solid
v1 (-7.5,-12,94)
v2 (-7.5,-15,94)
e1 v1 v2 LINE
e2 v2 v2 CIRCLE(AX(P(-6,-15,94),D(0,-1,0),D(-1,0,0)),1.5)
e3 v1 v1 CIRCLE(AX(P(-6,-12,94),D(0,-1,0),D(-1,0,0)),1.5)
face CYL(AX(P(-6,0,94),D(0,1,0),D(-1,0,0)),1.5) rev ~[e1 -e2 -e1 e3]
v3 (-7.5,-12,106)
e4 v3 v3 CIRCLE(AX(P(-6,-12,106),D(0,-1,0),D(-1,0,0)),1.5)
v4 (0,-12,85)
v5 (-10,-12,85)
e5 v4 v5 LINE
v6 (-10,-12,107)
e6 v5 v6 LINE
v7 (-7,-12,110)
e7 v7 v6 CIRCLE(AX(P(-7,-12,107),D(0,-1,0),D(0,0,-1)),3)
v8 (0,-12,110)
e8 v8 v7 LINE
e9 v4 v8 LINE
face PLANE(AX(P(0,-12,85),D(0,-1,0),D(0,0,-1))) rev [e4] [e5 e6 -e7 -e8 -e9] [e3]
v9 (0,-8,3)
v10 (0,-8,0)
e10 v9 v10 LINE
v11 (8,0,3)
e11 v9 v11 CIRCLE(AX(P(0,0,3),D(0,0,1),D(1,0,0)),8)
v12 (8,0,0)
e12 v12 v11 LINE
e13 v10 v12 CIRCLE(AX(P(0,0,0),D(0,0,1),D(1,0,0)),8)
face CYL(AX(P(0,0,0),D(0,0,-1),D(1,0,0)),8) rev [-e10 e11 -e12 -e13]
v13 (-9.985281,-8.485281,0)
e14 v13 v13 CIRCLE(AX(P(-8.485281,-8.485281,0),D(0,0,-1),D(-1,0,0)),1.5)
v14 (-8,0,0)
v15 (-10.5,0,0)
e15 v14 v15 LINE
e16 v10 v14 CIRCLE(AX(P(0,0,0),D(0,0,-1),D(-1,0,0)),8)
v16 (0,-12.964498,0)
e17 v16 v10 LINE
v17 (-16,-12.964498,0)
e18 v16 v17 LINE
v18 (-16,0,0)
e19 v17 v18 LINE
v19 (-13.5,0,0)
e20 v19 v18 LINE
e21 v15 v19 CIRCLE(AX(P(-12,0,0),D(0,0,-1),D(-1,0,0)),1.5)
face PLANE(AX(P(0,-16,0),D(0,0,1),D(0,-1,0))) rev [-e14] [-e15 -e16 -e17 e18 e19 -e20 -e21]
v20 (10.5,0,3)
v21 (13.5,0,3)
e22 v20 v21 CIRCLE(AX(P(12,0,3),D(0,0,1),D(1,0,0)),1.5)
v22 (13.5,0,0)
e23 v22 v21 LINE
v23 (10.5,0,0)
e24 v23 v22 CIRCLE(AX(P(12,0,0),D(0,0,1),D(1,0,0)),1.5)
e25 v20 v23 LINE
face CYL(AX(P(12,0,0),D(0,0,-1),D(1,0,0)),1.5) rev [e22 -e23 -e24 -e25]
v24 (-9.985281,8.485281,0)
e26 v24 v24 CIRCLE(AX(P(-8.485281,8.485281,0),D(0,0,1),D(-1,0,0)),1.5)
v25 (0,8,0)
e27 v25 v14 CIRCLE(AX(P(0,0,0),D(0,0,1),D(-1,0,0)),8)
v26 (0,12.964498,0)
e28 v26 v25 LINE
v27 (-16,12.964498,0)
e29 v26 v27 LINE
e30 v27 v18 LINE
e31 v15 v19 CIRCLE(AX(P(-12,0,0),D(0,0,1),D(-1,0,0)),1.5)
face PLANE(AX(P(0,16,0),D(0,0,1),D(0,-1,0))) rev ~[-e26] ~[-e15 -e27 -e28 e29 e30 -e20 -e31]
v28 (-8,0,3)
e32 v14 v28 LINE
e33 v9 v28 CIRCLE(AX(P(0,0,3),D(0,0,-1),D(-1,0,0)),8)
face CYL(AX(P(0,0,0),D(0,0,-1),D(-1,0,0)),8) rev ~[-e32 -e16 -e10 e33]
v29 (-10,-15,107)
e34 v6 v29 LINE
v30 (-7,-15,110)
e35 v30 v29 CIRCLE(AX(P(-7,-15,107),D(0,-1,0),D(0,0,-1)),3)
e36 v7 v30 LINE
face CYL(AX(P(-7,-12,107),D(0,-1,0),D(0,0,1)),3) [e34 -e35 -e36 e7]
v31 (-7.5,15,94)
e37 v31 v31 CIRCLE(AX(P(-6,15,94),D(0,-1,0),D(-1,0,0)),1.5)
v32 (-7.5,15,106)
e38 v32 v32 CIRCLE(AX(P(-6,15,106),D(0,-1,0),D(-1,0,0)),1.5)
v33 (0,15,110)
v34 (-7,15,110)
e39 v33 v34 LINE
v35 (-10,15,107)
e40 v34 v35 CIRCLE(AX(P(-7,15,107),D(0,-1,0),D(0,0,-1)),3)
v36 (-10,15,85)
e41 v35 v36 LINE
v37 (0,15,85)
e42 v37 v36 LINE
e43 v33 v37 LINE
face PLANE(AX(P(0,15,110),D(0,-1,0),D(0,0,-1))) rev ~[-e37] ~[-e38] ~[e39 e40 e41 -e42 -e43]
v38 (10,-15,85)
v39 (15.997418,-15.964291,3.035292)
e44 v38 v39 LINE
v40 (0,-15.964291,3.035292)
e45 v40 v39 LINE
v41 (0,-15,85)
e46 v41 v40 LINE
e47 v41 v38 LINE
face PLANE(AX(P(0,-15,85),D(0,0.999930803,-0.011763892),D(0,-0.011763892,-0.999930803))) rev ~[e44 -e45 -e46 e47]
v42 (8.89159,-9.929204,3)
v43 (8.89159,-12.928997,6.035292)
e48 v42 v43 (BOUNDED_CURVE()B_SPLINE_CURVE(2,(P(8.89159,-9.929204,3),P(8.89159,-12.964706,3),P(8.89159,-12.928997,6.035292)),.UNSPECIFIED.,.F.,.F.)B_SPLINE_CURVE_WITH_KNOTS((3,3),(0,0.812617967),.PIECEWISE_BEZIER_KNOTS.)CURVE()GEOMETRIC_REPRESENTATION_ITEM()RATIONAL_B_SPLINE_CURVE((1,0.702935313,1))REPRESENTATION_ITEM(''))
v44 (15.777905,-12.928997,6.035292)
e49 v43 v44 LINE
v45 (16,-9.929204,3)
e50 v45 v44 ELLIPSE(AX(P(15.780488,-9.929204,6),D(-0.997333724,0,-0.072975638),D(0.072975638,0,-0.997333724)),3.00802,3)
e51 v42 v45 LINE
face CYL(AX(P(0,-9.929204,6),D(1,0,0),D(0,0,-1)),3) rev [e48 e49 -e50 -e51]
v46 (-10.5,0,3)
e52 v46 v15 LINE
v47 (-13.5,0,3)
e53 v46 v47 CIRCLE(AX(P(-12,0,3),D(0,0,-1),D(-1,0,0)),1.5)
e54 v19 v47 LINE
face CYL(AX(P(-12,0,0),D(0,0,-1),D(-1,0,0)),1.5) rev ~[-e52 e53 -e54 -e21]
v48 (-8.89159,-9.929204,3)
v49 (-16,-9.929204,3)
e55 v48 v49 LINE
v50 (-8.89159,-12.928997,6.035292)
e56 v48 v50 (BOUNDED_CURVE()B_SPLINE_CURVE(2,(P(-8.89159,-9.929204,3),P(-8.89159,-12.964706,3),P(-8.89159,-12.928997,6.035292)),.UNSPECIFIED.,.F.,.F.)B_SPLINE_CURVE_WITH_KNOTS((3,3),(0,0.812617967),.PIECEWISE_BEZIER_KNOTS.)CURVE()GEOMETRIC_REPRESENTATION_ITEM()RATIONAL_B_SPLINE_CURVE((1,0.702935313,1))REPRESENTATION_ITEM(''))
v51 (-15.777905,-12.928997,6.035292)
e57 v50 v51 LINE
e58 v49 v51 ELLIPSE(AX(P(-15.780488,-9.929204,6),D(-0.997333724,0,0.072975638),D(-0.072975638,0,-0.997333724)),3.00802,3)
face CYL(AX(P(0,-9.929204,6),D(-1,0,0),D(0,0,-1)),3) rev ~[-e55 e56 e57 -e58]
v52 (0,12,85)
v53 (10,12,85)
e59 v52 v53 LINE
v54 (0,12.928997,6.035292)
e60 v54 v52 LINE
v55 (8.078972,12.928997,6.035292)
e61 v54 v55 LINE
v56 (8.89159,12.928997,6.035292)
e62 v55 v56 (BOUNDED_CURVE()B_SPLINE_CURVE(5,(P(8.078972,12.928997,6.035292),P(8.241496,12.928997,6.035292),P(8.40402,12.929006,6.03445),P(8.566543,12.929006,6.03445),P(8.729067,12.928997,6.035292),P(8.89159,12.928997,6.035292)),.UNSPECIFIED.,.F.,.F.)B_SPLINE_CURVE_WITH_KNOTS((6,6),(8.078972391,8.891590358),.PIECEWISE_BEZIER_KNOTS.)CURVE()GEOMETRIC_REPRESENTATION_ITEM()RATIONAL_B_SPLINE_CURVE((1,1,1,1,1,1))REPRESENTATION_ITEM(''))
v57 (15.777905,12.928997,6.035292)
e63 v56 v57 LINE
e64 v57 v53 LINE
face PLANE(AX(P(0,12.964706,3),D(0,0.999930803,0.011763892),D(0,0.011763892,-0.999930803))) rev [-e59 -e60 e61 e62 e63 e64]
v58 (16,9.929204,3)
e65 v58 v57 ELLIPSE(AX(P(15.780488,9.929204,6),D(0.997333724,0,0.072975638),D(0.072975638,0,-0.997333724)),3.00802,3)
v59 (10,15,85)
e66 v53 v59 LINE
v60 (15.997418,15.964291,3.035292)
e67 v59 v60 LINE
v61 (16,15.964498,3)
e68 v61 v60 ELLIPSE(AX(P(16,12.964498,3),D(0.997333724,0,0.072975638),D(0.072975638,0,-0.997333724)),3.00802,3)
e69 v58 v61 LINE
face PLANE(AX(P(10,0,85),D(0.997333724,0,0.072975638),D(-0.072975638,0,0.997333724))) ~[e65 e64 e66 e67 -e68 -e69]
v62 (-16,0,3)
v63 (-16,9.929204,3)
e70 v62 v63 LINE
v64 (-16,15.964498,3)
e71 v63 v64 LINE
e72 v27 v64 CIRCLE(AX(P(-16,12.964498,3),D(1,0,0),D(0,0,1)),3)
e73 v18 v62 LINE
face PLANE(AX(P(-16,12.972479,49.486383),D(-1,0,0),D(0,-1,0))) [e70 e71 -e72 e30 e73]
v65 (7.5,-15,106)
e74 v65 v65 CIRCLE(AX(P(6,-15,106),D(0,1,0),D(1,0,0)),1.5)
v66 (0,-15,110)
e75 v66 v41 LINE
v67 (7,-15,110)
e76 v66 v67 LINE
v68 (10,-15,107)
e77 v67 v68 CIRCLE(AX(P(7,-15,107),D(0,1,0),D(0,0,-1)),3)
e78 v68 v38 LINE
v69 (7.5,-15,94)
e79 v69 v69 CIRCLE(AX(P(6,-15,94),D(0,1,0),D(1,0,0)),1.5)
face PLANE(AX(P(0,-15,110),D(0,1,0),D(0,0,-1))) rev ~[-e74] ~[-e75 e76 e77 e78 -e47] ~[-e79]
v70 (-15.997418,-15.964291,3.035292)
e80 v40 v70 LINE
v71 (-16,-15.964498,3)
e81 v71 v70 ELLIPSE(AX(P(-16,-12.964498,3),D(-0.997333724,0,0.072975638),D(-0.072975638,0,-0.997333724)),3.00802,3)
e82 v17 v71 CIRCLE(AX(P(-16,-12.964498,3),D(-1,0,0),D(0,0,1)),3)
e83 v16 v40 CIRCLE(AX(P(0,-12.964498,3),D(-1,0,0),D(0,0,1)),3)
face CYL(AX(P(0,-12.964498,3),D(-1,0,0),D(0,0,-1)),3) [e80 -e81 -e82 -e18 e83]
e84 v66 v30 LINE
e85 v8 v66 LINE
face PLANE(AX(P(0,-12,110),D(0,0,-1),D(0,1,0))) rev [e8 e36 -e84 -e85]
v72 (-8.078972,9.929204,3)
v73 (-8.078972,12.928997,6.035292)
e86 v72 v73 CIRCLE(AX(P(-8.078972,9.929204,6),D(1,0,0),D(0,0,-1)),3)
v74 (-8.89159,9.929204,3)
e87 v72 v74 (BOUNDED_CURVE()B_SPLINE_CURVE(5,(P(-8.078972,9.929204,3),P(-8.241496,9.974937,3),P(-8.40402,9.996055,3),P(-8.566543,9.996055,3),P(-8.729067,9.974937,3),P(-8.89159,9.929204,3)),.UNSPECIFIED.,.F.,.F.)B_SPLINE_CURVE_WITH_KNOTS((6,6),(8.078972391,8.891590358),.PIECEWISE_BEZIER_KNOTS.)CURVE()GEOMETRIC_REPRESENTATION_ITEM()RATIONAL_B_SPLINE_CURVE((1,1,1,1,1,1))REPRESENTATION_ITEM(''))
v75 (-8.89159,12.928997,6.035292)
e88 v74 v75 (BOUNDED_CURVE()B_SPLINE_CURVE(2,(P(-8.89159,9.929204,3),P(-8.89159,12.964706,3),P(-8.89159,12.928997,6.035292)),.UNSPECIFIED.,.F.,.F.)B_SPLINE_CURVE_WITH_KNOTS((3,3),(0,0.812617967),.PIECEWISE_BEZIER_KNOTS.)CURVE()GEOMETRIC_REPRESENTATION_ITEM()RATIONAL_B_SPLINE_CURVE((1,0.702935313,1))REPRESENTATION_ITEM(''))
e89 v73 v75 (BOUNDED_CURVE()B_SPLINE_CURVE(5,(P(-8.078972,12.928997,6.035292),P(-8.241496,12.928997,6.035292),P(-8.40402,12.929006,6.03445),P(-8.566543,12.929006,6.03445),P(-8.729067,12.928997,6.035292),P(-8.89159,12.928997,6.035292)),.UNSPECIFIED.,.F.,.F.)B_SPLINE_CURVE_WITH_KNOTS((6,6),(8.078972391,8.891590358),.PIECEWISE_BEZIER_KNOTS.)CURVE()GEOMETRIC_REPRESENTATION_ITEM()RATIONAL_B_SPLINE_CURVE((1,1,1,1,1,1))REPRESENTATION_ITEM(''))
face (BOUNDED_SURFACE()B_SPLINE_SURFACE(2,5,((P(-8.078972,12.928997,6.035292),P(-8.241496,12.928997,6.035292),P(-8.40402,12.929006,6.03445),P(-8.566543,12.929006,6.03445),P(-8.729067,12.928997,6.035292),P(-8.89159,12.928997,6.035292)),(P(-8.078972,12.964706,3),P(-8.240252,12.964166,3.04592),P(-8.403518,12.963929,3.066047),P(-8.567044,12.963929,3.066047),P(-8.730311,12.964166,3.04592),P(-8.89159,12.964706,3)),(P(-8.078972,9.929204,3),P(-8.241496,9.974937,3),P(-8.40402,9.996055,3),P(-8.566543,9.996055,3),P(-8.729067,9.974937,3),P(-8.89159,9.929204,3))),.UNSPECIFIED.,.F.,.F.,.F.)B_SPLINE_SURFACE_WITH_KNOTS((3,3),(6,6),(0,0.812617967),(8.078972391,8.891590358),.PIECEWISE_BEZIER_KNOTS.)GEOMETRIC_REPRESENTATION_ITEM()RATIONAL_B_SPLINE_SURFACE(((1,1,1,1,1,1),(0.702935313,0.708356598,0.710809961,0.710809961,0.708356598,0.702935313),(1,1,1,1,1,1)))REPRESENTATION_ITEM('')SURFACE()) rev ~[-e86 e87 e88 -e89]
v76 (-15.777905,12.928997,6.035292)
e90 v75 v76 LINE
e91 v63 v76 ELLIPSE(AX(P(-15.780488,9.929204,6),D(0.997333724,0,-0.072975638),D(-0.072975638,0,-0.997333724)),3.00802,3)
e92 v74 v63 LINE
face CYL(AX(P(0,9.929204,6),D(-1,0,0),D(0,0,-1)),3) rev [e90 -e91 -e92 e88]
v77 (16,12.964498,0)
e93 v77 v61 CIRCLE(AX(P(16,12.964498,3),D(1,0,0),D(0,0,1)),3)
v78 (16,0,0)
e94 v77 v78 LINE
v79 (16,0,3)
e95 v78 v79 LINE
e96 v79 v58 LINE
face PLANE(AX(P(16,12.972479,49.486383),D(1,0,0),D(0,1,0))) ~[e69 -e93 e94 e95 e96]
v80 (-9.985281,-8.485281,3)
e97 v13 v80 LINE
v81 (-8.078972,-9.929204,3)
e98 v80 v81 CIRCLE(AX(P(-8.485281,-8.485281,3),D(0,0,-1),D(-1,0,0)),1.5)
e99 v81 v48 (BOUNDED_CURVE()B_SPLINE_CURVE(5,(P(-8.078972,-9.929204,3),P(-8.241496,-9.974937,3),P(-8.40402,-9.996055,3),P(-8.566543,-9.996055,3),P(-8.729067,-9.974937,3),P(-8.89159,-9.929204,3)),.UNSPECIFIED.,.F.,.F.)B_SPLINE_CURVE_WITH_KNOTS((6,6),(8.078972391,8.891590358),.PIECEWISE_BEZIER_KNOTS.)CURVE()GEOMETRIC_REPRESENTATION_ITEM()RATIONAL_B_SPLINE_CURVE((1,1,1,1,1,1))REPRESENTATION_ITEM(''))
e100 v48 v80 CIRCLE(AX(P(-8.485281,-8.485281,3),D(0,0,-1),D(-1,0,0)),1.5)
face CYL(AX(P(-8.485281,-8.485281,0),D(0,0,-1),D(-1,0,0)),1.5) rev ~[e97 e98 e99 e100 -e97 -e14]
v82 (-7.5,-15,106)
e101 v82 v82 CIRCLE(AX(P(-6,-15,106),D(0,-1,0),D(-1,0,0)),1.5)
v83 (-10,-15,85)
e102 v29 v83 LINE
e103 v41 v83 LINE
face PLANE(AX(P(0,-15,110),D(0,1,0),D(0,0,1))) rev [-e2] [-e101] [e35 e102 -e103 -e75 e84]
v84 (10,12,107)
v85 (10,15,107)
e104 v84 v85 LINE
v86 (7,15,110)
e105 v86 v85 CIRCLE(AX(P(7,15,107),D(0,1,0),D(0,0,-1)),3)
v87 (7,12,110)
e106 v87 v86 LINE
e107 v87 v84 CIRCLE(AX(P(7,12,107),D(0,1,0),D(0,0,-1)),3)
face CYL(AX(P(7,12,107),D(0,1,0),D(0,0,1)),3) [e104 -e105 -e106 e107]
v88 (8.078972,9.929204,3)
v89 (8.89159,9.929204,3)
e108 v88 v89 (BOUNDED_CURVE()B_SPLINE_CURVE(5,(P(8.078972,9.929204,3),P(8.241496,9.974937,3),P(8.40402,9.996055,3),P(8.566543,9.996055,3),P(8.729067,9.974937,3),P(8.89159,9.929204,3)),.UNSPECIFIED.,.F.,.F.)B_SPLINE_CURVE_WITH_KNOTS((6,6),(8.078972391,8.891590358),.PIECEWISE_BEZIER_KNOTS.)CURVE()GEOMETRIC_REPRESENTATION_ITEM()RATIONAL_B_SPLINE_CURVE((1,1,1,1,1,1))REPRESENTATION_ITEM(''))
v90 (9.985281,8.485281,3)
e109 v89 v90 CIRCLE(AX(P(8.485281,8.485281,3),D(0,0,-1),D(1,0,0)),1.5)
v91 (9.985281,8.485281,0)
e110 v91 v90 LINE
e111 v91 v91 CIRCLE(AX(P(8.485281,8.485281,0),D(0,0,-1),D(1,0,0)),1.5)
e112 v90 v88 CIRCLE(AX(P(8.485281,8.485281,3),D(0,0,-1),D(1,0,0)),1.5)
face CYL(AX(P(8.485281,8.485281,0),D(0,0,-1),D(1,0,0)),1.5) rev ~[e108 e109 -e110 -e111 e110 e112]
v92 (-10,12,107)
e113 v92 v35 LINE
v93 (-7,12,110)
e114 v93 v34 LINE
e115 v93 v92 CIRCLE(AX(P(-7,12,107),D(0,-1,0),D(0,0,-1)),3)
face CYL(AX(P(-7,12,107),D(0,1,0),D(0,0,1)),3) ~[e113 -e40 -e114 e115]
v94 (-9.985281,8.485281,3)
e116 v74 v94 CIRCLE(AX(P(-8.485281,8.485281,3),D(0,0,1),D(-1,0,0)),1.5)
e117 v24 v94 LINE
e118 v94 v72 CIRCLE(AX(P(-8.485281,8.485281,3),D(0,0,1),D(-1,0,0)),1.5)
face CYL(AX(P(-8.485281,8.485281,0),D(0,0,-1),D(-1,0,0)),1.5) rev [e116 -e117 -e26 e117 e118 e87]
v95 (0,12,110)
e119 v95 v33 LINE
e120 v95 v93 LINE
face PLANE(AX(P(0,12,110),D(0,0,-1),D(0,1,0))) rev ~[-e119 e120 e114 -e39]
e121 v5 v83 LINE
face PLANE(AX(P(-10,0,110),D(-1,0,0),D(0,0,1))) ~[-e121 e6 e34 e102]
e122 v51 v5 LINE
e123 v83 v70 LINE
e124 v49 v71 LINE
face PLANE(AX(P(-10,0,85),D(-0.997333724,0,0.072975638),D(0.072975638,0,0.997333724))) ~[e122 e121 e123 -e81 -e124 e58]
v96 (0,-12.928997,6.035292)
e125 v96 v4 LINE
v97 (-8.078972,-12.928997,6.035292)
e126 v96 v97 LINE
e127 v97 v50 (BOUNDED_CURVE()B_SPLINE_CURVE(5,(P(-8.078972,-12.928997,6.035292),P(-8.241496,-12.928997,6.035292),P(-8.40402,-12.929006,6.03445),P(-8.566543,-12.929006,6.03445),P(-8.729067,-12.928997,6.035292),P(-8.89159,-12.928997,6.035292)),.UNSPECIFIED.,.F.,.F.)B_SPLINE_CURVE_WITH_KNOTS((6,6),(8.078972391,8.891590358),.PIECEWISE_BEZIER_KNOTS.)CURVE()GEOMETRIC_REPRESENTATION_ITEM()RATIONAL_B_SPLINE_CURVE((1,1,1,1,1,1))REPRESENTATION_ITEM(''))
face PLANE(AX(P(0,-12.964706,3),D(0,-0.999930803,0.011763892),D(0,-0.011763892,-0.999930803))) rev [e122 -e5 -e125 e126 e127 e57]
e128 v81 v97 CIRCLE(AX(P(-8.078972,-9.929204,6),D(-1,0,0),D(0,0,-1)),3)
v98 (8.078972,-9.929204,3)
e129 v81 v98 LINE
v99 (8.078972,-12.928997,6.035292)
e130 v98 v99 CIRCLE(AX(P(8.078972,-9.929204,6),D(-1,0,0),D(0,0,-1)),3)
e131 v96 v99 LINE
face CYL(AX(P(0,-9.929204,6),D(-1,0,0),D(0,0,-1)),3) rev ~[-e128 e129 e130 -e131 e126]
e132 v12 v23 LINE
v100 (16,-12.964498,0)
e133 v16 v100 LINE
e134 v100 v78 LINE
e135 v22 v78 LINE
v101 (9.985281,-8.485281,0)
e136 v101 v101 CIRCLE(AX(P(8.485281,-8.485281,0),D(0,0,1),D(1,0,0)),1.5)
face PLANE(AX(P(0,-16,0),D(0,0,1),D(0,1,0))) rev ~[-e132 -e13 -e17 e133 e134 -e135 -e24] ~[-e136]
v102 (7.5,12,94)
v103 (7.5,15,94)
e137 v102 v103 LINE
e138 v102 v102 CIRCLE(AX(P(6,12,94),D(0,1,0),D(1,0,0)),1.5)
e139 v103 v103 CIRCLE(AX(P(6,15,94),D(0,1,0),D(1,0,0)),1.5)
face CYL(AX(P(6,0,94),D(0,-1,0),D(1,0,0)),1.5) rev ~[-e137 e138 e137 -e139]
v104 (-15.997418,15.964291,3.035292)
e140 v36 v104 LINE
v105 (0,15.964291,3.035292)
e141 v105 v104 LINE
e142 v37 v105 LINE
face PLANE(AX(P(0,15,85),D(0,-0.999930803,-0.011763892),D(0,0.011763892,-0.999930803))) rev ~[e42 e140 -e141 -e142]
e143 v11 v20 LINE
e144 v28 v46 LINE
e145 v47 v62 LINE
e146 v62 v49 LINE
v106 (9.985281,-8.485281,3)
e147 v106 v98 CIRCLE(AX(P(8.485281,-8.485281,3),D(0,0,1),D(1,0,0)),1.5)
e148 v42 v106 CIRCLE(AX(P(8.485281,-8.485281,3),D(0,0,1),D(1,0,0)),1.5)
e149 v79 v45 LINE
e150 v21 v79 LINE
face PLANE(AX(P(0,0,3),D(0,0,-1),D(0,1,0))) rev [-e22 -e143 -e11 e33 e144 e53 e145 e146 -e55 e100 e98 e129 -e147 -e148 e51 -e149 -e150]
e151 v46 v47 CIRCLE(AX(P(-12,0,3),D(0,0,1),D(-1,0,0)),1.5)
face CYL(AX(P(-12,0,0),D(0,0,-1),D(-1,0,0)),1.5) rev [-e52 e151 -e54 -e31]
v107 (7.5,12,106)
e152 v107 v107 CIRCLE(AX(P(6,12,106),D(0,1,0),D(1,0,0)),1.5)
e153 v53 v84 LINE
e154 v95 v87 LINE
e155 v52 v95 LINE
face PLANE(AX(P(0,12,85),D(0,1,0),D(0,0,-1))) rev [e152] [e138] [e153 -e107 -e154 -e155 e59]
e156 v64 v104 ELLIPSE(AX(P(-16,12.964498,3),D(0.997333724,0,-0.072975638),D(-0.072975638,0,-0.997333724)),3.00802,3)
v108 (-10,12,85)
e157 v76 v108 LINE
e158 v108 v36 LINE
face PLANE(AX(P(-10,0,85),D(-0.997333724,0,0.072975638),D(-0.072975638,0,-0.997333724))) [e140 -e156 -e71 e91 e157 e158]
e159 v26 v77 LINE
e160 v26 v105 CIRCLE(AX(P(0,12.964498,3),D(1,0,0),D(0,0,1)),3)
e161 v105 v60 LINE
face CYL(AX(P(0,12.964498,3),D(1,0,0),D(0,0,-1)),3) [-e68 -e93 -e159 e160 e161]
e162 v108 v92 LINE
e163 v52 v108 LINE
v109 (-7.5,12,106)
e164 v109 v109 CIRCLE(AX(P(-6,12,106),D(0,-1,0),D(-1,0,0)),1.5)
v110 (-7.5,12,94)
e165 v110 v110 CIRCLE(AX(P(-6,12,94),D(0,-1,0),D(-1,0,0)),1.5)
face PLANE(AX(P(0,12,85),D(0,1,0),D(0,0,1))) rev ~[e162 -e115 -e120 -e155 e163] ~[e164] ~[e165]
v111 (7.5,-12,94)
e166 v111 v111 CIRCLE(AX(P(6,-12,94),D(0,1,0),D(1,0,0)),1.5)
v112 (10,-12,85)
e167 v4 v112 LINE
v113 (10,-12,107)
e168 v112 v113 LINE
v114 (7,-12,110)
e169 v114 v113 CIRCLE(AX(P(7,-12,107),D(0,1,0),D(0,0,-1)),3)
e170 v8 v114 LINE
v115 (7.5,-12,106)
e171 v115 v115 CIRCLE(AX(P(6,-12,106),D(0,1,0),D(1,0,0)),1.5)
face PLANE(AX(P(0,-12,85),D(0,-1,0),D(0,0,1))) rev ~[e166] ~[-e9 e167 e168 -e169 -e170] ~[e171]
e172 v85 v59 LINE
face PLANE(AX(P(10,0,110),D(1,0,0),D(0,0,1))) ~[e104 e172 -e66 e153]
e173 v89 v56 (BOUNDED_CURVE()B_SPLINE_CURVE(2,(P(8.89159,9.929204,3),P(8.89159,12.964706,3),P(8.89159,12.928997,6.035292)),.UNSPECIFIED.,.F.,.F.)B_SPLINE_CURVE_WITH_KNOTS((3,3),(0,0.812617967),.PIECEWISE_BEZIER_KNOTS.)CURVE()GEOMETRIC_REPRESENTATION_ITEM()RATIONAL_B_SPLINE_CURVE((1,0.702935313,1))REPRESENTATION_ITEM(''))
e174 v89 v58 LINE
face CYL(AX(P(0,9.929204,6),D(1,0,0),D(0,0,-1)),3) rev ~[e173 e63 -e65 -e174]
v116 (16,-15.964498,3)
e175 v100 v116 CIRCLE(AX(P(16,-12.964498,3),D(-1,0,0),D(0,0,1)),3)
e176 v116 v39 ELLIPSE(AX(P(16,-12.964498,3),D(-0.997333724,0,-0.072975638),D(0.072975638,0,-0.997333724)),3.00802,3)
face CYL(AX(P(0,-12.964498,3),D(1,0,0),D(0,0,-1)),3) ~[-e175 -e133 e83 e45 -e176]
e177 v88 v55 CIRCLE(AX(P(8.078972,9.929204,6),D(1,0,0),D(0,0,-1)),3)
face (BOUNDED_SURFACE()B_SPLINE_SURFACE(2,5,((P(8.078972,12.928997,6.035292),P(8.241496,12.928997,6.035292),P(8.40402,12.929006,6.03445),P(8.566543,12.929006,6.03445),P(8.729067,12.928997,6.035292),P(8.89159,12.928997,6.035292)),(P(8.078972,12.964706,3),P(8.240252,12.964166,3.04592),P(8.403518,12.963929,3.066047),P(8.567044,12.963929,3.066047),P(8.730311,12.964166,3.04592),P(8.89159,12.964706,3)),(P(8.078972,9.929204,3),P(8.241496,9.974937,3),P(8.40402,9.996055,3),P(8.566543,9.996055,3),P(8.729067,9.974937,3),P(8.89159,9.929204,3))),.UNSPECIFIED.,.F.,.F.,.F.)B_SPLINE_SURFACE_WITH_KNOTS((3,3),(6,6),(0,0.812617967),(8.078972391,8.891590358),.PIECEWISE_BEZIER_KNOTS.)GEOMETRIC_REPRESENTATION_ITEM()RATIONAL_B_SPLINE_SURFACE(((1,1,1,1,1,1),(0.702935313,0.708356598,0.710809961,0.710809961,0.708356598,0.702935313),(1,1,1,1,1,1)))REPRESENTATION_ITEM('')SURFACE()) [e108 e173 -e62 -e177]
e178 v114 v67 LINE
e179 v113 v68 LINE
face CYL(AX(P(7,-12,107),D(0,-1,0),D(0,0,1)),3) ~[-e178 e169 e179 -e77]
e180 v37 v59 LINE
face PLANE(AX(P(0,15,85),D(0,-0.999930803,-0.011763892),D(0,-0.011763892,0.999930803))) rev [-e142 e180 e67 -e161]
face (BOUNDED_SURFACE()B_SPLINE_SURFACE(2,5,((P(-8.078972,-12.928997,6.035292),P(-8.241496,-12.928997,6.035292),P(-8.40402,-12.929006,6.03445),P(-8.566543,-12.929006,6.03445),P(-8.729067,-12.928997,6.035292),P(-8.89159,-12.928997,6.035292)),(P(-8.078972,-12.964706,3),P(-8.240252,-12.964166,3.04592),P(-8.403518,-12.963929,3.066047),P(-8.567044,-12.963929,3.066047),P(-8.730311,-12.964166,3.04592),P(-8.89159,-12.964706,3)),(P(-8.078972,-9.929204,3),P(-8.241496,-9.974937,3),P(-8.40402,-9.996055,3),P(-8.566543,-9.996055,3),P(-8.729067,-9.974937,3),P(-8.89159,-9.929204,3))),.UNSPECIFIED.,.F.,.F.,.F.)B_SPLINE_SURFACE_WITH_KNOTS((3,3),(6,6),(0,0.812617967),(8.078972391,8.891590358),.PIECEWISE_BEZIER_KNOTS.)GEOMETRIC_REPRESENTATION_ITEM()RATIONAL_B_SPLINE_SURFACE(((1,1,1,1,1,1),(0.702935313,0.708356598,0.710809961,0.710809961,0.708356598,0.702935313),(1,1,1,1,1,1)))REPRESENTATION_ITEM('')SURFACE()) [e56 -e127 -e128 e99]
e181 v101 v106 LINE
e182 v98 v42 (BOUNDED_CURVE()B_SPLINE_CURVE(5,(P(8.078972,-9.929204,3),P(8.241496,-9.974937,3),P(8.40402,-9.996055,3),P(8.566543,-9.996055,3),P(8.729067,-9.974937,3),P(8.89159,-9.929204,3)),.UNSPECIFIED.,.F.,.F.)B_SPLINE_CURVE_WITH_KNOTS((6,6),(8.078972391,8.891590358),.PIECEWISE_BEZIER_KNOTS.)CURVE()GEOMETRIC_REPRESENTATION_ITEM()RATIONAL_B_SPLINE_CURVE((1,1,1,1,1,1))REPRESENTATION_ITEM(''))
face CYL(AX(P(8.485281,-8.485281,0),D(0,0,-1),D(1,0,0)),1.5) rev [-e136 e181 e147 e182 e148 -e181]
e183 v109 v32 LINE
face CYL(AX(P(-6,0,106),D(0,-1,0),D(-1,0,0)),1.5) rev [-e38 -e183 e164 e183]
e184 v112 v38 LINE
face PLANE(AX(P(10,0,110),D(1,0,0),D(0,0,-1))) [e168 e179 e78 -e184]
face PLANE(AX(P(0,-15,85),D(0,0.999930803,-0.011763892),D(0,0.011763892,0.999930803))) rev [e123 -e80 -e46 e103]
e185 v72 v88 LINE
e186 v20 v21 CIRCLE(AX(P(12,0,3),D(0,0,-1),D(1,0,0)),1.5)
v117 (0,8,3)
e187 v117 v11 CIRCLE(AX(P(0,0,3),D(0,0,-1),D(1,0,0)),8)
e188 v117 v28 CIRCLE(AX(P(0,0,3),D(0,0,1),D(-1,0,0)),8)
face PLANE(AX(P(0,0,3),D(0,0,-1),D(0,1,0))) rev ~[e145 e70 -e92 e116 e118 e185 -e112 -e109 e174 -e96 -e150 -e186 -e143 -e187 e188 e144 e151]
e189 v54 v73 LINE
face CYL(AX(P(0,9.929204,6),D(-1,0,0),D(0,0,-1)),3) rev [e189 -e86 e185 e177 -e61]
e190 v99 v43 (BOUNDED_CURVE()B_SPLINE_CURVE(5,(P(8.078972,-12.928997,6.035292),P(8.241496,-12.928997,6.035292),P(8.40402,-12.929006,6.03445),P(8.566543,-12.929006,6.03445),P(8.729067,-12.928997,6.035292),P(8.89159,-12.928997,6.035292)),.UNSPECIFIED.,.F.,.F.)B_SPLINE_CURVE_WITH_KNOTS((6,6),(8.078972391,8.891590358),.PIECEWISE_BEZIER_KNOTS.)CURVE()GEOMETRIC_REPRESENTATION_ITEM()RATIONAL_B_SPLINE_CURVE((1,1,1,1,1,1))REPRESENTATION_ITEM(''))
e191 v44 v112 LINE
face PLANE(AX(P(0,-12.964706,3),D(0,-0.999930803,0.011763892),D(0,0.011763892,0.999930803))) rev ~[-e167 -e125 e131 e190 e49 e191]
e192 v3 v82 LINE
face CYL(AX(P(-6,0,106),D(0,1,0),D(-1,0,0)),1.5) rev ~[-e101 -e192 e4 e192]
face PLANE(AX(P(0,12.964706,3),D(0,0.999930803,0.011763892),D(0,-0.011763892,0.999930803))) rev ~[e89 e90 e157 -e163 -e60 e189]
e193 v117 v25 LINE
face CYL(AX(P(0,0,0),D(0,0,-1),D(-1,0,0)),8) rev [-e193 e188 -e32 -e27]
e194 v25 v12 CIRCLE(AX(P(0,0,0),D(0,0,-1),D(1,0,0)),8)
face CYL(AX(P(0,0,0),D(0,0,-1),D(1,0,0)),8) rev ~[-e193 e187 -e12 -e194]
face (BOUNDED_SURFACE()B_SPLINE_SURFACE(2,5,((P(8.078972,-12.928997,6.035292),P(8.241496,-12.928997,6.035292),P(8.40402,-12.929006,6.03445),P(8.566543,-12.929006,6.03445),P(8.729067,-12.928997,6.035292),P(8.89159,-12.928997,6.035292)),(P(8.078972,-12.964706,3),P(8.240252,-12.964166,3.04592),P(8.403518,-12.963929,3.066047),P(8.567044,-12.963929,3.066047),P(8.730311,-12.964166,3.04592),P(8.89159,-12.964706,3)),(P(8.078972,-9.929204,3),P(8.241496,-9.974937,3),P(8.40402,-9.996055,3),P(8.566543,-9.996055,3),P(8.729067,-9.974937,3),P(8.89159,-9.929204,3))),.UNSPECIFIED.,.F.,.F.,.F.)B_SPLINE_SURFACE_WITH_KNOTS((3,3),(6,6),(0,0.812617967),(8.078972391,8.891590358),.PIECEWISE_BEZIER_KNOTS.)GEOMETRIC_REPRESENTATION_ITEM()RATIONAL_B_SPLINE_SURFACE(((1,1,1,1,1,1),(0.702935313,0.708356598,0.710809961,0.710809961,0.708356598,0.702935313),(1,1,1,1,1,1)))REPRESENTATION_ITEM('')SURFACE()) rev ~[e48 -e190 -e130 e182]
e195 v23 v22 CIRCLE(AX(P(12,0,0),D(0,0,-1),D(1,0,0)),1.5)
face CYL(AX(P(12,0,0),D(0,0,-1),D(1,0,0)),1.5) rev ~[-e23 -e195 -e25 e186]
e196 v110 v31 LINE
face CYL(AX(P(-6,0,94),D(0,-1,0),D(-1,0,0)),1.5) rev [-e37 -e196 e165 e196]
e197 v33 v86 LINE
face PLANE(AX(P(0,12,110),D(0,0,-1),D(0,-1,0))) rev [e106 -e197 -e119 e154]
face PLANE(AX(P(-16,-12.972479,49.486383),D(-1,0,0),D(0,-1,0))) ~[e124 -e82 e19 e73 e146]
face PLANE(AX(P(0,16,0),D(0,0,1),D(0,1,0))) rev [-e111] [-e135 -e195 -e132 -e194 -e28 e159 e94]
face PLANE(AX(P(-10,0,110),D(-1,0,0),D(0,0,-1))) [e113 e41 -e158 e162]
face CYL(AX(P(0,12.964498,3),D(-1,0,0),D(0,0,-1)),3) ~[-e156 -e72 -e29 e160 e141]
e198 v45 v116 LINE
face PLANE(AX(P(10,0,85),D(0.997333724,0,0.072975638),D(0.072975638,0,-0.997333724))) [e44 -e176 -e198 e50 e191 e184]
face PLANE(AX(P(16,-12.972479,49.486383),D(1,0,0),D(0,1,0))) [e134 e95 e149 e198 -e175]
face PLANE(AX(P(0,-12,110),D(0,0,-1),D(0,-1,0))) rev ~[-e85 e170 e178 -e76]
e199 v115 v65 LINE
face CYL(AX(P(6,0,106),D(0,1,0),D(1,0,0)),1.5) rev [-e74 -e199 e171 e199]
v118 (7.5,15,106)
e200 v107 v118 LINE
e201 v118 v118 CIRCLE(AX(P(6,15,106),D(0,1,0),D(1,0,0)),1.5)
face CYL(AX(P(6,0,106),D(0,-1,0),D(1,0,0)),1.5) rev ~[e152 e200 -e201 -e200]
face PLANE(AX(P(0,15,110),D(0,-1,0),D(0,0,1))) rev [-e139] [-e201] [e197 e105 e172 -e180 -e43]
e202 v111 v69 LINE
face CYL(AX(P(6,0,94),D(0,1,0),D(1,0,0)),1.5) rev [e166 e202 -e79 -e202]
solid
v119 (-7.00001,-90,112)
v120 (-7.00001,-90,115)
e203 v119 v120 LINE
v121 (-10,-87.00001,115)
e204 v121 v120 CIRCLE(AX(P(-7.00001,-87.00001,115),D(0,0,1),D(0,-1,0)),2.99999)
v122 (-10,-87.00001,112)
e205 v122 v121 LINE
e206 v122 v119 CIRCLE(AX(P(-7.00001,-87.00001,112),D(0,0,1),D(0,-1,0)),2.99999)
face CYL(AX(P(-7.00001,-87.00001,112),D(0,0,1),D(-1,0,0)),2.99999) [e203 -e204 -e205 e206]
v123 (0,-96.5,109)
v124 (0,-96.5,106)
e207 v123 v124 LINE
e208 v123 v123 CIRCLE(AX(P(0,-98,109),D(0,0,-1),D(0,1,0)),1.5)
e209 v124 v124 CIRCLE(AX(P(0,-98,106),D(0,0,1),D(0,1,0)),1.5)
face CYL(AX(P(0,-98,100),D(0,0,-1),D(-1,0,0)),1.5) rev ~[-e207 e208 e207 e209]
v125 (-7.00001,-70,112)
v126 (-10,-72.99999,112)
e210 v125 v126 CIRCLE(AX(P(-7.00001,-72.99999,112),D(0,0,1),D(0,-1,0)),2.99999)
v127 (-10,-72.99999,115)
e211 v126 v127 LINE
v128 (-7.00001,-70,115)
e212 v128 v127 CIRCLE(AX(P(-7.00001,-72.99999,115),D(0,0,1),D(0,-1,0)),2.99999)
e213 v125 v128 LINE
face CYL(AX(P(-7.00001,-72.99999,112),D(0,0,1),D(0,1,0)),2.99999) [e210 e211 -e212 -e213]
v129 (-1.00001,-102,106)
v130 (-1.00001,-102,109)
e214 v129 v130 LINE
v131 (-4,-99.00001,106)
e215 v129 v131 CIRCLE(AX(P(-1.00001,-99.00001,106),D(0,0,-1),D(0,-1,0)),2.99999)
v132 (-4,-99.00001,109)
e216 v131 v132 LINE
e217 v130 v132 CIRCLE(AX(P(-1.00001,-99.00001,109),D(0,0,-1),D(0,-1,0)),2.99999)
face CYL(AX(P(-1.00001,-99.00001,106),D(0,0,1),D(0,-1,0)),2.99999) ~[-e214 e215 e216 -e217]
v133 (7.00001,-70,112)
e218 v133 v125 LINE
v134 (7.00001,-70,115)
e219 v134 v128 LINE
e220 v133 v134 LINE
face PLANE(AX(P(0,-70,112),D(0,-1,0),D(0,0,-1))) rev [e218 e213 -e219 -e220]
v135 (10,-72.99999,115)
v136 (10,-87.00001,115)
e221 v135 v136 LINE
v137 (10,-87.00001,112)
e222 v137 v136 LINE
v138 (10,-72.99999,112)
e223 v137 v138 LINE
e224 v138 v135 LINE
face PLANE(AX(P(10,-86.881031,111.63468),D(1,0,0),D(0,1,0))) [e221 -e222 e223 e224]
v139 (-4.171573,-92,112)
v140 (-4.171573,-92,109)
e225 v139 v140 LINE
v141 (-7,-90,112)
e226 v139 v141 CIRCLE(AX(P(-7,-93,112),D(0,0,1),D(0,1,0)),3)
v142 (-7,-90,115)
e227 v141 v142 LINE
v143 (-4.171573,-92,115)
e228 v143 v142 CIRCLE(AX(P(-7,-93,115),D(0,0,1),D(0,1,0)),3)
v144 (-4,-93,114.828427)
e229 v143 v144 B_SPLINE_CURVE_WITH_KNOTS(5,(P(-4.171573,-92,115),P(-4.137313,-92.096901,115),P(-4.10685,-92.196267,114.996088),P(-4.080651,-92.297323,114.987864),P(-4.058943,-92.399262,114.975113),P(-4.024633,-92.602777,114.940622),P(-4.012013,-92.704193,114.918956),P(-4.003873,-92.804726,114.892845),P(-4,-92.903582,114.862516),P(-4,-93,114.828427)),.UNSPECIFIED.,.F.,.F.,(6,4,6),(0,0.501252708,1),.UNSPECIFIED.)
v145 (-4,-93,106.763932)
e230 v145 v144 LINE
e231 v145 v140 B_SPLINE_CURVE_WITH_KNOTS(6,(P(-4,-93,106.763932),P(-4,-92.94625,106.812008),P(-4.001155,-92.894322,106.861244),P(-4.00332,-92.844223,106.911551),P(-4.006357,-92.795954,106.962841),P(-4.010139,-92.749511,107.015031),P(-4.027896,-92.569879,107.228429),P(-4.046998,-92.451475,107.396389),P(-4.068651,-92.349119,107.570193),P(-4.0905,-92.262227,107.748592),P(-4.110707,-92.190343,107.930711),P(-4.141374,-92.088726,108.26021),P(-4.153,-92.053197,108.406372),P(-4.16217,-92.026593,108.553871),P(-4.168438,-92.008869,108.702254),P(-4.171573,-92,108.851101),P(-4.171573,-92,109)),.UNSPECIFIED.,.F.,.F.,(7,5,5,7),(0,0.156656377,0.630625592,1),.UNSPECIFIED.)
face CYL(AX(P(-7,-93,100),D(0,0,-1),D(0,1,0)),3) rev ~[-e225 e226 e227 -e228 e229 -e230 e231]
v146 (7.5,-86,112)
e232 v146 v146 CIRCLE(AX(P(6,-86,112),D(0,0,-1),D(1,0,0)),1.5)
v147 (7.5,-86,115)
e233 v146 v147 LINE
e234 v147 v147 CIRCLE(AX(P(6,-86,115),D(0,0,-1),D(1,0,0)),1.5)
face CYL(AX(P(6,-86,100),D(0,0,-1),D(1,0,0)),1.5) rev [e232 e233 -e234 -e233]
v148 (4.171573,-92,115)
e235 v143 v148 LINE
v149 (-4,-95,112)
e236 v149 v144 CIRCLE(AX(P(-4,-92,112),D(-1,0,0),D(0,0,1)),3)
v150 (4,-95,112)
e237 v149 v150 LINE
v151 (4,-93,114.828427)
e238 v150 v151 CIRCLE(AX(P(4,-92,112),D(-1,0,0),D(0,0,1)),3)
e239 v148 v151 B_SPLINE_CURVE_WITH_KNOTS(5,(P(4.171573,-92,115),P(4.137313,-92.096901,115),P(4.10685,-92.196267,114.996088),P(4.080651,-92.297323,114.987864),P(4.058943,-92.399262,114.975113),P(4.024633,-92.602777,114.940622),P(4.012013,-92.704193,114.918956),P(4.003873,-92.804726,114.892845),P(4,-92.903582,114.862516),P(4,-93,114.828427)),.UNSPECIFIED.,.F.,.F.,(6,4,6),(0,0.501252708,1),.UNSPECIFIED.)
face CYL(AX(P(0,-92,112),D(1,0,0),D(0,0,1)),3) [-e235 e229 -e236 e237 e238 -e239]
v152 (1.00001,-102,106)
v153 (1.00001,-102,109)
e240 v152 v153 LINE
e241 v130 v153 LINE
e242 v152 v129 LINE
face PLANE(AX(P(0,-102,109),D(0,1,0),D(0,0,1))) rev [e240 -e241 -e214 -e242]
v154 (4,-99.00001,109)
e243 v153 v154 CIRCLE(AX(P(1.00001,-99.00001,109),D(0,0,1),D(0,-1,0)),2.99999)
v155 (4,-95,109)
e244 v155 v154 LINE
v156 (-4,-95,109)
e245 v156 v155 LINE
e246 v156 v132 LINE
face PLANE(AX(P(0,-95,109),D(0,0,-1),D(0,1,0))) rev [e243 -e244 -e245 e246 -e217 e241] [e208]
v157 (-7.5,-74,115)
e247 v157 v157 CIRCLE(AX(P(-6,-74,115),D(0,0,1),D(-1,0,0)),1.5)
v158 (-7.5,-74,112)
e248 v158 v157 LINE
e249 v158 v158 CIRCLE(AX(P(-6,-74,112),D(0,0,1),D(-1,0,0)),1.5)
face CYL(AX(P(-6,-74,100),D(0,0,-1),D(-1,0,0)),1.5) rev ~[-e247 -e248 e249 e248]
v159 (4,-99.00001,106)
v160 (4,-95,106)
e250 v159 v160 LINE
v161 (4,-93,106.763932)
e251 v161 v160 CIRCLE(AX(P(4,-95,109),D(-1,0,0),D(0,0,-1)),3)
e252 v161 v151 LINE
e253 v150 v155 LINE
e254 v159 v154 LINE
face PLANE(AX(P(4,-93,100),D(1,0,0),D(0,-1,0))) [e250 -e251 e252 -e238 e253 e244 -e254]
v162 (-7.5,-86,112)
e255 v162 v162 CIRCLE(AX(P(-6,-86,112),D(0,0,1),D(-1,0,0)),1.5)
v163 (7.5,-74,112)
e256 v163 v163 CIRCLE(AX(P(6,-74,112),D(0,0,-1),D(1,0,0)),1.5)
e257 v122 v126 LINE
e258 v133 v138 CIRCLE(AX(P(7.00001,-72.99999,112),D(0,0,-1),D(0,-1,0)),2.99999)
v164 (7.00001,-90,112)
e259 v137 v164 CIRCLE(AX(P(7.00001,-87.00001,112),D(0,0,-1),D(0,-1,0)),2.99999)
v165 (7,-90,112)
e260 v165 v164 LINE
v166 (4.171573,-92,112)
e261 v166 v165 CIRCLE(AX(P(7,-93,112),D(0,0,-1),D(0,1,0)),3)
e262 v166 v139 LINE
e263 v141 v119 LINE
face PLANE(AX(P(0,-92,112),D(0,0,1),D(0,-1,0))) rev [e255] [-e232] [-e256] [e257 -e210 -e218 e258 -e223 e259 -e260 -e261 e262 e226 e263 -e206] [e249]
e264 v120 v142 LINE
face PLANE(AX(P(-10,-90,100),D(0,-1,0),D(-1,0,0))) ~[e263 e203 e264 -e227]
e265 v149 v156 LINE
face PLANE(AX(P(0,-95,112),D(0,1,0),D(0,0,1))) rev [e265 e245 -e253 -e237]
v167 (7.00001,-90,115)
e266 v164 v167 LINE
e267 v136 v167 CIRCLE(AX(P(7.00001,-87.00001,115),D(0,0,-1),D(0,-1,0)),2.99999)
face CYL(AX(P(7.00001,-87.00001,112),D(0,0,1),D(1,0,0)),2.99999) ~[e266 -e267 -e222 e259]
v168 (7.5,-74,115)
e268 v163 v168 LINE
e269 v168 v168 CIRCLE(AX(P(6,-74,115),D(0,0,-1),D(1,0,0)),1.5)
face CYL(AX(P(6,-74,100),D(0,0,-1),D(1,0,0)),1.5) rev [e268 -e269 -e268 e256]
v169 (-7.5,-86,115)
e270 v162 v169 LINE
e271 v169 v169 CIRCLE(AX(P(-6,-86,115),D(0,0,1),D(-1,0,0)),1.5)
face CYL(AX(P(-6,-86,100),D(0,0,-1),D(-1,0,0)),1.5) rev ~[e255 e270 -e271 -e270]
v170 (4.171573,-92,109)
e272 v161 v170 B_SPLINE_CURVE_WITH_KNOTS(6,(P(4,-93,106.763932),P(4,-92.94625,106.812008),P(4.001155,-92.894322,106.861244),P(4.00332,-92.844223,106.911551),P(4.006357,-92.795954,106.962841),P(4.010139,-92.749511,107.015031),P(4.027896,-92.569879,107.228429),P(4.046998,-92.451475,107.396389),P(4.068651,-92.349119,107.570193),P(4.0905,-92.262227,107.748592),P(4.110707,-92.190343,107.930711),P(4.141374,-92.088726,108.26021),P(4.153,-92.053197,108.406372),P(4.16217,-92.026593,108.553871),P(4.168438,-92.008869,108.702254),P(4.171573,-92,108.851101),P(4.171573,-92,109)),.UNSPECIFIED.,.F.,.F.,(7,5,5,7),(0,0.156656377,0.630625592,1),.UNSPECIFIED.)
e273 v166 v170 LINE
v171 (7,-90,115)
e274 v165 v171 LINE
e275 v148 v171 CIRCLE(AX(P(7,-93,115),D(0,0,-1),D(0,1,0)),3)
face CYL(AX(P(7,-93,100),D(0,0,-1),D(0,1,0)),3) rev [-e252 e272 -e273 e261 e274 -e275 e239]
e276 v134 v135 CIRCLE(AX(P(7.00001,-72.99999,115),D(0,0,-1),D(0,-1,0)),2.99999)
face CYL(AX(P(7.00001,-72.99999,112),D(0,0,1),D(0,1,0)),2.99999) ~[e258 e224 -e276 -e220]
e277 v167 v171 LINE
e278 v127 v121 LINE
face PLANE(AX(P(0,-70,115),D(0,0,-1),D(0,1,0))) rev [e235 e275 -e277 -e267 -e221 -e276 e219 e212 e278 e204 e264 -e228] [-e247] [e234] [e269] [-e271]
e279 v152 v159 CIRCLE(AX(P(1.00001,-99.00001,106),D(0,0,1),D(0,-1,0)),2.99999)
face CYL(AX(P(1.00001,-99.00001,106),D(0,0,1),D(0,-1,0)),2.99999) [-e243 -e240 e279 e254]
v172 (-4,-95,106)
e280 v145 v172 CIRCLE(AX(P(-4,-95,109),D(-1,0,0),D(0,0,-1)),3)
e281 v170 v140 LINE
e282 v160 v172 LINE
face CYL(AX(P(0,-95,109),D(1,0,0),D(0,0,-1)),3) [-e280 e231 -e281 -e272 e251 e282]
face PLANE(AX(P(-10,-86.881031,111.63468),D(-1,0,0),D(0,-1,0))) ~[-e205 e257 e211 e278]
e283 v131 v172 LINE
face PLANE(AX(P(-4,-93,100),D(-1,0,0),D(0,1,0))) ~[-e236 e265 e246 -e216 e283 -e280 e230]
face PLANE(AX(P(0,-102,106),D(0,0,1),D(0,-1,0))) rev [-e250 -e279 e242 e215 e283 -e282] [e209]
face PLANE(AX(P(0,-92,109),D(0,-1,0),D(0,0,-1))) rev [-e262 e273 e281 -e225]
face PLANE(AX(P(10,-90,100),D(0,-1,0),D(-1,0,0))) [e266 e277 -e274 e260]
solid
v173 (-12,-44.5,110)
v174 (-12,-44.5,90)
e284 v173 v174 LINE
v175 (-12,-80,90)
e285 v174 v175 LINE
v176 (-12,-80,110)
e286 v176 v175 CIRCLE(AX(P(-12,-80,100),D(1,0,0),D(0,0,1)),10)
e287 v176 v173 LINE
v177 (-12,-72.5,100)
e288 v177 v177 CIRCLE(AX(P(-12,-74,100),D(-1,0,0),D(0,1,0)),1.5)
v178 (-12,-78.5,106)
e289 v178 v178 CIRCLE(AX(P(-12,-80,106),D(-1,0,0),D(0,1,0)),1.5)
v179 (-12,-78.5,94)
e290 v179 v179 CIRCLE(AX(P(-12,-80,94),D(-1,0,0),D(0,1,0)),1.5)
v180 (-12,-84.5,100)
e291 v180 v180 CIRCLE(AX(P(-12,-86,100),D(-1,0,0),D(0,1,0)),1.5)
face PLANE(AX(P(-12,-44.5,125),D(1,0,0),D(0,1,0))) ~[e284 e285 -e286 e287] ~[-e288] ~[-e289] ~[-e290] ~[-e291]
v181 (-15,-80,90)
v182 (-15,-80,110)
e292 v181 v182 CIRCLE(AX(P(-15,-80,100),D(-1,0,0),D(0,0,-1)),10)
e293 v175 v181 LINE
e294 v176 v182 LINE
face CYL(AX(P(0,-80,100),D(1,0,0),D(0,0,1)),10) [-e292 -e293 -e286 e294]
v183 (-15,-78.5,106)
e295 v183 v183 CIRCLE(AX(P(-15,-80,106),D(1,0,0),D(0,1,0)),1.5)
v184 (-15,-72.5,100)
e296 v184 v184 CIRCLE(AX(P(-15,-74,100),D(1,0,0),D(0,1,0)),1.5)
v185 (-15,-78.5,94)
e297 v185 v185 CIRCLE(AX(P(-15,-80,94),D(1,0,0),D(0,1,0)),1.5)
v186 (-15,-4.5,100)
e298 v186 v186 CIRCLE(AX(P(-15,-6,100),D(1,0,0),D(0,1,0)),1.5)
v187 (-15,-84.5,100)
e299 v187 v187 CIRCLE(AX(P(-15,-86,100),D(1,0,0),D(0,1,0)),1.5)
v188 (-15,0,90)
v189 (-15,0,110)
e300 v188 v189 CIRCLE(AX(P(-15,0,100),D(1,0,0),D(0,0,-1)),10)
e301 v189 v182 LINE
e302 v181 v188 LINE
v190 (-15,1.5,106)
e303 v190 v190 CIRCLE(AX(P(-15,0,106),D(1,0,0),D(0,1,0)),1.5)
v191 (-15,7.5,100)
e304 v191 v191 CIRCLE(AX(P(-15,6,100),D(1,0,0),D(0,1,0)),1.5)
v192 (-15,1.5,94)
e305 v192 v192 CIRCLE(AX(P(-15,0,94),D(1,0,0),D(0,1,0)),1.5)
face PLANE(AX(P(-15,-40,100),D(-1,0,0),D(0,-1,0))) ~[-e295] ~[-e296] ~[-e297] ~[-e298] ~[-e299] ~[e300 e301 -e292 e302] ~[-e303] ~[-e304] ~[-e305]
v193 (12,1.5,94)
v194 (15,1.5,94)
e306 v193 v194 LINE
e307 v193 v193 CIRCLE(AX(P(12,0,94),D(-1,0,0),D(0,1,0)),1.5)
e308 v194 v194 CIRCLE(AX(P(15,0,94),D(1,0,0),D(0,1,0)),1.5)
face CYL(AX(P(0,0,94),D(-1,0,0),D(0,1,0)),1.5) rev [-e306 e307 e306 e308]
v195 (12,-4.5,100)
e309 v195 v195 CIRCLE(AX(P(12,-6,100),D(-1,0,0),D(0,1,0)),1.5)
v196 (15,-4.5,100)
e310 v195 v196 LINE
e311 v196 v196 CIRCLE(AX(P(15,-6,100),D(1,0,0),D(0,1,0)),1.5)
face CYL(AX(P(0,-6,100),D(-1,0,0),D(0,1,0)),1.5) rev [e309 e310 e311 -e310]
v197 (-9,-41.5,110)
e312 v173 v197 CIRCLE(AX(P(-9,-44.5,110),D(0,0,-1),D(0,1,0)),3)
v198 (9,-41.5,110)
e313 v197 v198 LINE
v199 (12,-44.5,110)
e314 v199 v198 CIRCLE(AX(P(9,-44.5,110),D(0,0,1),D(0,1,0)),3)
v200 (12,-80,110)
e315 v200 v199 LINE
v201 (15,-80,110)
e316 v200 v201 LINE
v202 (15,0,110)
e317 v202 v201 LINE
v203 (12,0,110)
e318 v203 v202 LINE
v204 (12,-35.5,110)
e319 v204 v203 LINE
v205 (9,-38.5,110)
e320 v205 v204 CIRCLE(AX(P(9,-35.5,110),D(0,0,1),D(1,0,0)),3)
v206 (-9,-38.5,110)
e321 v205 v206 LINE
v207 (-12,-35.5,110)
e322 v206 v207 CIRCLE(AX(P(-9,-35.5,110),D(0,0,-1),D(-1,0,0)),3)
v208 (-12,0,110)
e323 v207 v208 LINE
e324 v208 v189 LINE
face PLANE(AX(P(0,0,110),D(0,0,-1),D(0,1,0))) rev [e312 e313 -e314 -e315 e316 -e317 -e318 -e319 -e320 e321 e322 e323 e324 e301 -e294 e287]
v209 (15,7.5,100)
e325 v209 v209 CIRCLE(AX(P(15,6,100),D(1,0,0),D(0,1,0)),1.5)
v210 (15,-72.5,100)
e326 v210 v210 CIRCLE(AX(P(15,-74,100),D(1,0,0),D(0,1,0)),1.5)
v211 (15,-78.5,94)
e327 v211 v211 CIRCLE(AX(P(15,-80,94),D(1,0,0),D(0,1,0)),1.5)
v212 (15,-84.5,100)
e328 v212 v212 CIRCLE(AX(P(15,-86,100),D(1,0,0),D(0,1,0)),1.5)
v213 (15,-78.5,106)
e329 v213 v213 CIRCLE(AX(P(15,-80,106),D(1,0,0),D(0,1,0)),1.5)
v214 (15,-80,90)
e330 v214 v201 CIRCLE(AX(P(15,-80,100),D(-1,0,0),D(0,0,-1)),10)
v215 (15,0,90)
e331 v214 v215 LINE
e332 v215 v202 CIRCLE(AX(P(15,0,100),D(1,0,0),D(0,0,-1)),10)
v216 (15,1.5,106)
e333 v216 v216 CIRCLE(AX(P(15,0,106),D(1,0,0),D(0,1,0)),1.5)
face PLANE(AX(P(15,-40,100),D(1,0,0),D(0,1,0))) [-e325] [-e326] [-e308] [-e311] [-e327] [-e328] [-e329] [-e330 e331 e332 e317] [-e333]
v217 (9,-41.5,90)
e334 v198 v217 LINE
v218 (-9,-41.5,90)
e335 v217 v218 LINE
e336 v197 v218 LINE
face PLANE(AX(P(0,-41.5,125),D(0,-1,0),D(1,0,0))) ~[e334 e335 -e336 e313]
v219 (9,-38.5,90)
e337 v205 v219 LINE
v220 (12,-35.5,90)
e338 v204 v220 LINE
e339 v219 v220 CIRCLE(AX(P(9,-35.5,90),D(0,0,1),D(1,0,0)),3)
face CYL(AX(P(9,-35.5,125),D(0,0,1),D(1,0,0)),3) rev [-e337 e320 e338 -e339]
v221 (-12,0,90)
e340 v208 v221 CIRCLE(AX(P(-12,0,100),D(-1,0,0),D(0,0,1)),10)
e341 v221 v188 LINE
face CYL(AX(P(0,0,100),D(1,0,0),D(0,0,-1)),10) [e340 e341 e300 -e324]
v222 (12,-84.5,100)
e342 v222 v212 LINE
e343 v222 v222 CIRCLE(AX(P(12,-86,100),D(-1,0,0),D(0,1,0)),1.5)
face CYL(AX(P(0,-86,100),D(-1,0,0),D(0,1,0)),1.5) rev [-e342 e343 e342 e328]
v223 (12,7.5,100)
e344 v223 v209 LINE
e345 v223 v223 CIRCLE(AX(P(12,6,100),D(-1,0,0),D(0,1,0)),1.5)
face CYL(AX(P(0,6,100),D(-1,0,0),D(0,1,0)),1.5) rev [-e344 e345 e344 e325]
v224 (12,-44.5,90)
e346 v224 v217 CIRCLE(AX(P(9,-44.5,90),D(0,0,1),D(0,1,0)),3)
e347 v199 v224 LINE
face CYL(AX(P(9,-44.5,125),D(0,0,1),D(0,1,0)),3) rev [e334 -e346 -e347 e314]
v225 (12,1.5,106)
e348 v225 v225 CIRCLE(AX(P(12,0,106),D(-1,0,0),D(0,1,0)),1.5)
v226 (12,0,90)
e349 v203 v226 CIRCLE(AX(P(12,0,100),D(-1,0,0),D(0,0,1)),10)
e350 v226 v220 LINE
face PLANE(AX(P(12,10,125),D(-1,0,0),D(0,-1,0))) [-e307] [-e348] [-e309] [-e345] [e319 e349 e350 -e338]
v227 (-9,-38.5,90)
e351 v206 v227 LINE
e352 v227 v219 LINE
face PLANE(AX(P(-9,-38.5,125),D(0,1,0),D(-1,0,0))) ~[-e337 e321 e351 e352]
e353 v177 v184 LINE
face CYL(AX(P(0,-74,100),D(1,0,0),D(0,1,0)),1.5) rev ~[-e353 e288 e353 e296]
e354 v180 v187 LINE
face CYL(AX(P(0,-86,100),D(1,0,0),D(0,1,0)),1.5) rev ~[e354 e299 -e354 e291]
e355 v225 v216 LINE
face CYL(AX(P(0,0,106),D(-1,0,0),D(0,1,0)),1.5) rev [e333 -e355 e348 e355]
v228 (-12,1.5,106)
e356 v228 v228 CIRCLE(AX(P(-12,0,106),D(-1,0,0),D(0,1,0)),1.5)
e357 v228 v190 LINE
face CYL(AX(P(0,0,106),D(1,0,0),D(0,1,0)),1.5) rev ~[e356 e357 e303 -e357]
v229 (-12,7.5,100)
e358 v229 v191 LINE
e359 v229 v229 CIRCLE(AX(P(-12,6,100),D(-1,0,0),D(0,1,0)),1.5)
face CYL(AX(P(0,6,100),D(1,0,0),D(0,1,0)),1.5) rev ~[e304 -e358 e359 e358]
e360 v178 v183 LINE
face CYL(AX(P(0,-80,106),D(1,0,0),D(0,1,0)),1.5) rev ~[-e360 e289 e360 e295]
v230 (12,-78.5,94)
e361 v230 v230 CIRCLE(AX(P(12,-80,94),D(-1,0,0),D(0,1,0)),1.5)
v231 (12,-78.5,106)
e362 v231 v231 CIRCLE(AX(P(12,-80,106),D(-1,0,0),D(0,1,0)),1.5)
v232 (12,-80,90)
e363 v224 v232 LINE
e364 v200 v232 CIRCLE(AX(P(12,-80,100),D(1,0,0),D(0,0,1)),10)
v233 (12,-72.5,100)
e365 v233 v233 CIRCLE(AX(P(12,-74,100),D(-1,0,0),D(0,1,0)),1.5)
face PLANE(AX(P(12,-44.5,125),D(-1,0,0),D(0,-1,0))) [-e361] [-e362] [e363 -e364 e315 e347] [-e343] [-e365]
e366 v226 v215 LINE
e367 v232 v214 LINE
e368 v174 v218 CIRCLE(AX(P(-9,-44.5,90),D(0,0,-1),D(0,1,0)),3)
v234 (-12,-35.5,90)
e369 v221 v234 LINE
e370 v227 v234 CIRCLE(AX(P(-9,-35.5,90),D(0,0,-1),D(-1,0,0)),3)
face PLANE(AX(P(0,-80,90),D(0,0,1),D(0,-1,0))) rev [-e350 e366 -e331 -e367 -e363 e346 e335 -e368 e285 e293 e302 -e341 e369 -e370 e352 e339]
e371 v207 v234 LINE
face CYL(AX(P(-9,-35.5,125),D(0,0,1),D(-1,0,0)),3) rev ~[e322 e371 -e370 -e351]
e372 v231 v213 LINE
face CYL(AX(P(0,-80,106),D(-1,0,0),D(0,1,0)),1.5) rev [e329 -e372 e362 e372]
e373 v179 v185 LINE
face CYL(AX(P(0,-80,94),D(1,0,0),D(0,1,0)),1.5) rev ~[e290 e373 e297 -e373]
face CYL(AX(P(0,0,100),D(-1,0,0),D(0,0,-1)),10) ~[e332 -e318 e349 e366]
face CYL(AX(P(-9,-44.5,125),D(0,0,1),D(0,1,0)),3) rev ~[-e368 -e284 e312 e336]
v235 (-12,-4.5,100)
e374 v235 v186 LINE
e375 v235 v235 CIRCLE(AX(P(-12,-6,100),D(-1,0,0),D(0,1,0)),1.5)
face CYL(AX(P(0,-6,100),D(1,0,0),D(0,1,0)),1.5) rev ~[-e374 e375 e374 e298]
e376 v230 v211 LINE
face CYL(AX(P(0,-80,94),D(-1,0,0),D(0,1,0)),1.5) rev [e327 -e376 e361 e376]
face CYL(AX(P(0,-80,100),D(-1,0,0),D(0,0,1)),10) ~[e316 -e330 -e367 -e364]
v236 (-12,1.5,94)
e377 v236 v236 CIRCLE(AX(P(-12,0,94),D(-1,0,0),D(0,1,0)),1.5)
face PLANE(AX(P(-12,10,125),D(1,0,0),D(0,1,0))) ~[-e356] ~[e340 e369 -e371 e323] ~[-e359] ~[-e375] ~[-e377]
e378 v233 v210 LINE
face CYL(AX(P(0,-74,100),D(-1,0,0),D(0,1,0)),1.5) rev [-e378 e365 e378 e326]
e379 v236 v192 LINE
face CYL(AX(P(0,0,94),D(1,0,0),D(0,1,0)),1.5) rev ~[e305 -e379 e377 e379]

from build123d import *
from build123d import SkipClean  # not in build123d's __all__

# Parameters (mm, degrees)
F6_DEPTH  = 16
F7_R      = 1.5
F8_DEPTH  = 16.001
F9_R      = 1.5
F9_R_2    = 8
F10_DEPTH = 3
F11_R     = 3
F14_R     = 1.5
F15_DEPTH = 15
F17_START = 25
F17_DEPTH = 50
F20_DEPTH = 10
F21_R     = 1.5
F22_DEPTH = 25
F23_R     = 2.99999


# Not quite as in the source:
# - a fillet or chamfer is up to 0.001 mm smaller than in the source, because OpenCascade refuses the exact size


with BuildPart() as f6:
    # F5 (on Right) → F6 (new body)
    with BuildSketch(Plane.YZ):
        Polygon((0, 0), (0, 3), (-12.9647058824, 3), (-12, 85), (-12, 110), (-15, 110), (-15, 85), (-16, 0), align=None)
    extrude(amount=F6_DEPTH)

    # F7 (on Front) → F8 (cut, through all)
    with BuildSketch(Plane.XZ):
        Polygon((16, 110), (10, 110), (10, 85), (16, 3), align=None)
        with Locations((6, 106)):
            Circle(F7_R)
        with Locations((6, 94)):
            Circle(F7_R)
    extrude(amount=F8_DEPTH, mode=Mode.SUBTRACT)

    # F9 (on Top) → F10 (cut, through all)
    with BuildSketch(Plane.XY):
        with Locations((12, 0)):
            Circle(F9_R)
        with Locations((8.4852813742, -8.4852813742)):
            Circle(F9_R)
        Circle(F9_R_2)
    extrude(amount=F10_DEPTH, mode=Mode.SUBTRACT)

    # F11
    f11_edges = [f6.edges().sort_by_distance(p)[0] for p in [
        (10, -13.5, 110),
        (8, -16, 0),
        (8, -12.964706, 3),
    ]]
    fillet(f11_edges, radius=F11_R)

    # F12: F6 across plane


with BuildPart() as f6_1:
    add(f6.part, clean=False)
    add(f6.part.mirror(Plane.YZ), clean=False)

    # F13: F6 across plane


with BuildPart() as f6_2:
    add(f6_1.part, clean=False)
    with SkipClean():  # cleaning this boolean's faces spoils the solid; the shape is the same uncleaned
        add(f6_1.part.mirror(Plane.XZ), clean=False)


with BuildPart() as f15:
    # F14 (on Right) → F15 (new body)
    with BuildSketch(Plane.YZ):
        with BuildLine():
            ThreePointArc((-80, 110), (-90, 100), (-80, 90))
            Line((-80, 90), (0, 90))
            ThreePointArc((0, 90), (10, 100), (0, 110))
            Line((0, 110), (-80, 110))
        make_face()
        with Locations((-80, 94)):
            Circle(F14_R, mode=Mode.SUBTRACT)
        with Locations((0, 94)):
            Circle(F14_R, mode=Mode.SUBTRACT)
        with Locations((-86, 100)):
            Circle(F14_R, mode=Mode.SUBTRACT)
        with Locations((-74, 100)):
            Circle(F14_R, mode=Mode.SUBTRACT)
        with Locations((-80, 106)):
            Circle(F14_R, mode=Mode.SUBTRACT)
        with Locations((-6, 100)):
            Circle(F14_R, mode=Mode.SUBTRACT)
        with Locations((6, 100)):
            Circle(F14_R, mode=Mode.SUBTRACT)
        with Locations((0, 106)):
            Circle(F14_R, mode=Mode.SUBTRACT)
    extrude(amount=F15_DEPTH)

    # F16 (on plane+point) → F17 (intersect)
    with BuildSketch(Plane.XY.offset(100).offset(F17_START)):
        with BuildLine():
            Line((12, -90), (15, -90))
            Line((15, -90), (15, 10))
            Line((15, 10), (12, 10))
            Line((12, 10), (12, -35.5))
            ThreePointArc((12, -35.5), (11.1213203436, -37.6213203436), (9, -38.5))
            Line((9, -38.5), (0, -38.5))
            Line((0, -38.5), (0, -41.5))
            Line((0, -41.5), (9, -41.5))
            ThreePointArc((9, -41.5), (11.1213203436, -42.3786796564), (12, -44.5))
            Line((12, -44.5), (12, -90))
        make_face()
    extrude(amount=-F17_DEPTH, mode=Mode.INTERSECT)

    # F18: F15 across plane


with BuildPart() as f15_1:
    add(f15.part, clean=False)
    add(f15.part.mirror(Plane.YZ), clean=False)


with BuildPart() as f20:
    # F19 (on Right) → F20 (new body)
    with BuildSketch(Plane.YZ):
        with BuildLine():
            Line((-95, 112), (-95, 109))
            Line((-95, 109), (-102, 109))
            Line((-102, 109), (-102, 106))
            Line((-102, 106), (-95, 106))
            ThreePointArc((-95, 106), (-92.8786796564, 106.8786796564), (-92, 109))
            Line((-92, 109), (-92, 112))
            Line((-92, 112), (-70, 112))
            Line((-70, 112), (-70, 115))
            Line((-70, 115), (-92, 115))
            ThreePointArc((-92, 115), (-94.1213203436, 114.1213203436), (-95, 112))
        make_face()
    extrude(amount=F20_DEPTH)

    # F21 (on plane+point) → F22 (cut)
    with BuildSketch(Plane.XY.offset(100)):
        with Locations((0, -98)):
            Circle(F21_R)
        with Locations((6, -86)):
            Circle(F21_R)
        with Locations((6, -74)):
            Circle(F21_R)
        with BuildLine():
            Line((4, -93), (4, -102))
            Line((4, -102), (10, -102))
            Line((10, -102), (10, -90))
            Line((10, -90), (7, -90))
            ThreePointArc((7, -90), (4.8786796564, -90.8786796564), (4, -93))
        make_face()
    extrude(amount=F22_DEPTH, mode=Mode.SUBTRACT)

    # F23 (radius 3 in the source; OpenCascade refuses exactly that, so slightly less here)
    f23_edges = [f20.edges().sort_by_distance(p)[0] for p in [
        (10, -90, 113.5),
        (10, -70, 113.5),
        (4, -102, 107.5),
    ]]
    fillet(f23_edges, radius=F23_R)

    # F24: F20 across plane


with BuildPart() as f20_1:
    add(f20.part, clean=False)
    add(f20.part.mirror(Plane.YZ), clean=False)


solid = Compound([f6_2.part, f15_1.part, f20_1.part])
